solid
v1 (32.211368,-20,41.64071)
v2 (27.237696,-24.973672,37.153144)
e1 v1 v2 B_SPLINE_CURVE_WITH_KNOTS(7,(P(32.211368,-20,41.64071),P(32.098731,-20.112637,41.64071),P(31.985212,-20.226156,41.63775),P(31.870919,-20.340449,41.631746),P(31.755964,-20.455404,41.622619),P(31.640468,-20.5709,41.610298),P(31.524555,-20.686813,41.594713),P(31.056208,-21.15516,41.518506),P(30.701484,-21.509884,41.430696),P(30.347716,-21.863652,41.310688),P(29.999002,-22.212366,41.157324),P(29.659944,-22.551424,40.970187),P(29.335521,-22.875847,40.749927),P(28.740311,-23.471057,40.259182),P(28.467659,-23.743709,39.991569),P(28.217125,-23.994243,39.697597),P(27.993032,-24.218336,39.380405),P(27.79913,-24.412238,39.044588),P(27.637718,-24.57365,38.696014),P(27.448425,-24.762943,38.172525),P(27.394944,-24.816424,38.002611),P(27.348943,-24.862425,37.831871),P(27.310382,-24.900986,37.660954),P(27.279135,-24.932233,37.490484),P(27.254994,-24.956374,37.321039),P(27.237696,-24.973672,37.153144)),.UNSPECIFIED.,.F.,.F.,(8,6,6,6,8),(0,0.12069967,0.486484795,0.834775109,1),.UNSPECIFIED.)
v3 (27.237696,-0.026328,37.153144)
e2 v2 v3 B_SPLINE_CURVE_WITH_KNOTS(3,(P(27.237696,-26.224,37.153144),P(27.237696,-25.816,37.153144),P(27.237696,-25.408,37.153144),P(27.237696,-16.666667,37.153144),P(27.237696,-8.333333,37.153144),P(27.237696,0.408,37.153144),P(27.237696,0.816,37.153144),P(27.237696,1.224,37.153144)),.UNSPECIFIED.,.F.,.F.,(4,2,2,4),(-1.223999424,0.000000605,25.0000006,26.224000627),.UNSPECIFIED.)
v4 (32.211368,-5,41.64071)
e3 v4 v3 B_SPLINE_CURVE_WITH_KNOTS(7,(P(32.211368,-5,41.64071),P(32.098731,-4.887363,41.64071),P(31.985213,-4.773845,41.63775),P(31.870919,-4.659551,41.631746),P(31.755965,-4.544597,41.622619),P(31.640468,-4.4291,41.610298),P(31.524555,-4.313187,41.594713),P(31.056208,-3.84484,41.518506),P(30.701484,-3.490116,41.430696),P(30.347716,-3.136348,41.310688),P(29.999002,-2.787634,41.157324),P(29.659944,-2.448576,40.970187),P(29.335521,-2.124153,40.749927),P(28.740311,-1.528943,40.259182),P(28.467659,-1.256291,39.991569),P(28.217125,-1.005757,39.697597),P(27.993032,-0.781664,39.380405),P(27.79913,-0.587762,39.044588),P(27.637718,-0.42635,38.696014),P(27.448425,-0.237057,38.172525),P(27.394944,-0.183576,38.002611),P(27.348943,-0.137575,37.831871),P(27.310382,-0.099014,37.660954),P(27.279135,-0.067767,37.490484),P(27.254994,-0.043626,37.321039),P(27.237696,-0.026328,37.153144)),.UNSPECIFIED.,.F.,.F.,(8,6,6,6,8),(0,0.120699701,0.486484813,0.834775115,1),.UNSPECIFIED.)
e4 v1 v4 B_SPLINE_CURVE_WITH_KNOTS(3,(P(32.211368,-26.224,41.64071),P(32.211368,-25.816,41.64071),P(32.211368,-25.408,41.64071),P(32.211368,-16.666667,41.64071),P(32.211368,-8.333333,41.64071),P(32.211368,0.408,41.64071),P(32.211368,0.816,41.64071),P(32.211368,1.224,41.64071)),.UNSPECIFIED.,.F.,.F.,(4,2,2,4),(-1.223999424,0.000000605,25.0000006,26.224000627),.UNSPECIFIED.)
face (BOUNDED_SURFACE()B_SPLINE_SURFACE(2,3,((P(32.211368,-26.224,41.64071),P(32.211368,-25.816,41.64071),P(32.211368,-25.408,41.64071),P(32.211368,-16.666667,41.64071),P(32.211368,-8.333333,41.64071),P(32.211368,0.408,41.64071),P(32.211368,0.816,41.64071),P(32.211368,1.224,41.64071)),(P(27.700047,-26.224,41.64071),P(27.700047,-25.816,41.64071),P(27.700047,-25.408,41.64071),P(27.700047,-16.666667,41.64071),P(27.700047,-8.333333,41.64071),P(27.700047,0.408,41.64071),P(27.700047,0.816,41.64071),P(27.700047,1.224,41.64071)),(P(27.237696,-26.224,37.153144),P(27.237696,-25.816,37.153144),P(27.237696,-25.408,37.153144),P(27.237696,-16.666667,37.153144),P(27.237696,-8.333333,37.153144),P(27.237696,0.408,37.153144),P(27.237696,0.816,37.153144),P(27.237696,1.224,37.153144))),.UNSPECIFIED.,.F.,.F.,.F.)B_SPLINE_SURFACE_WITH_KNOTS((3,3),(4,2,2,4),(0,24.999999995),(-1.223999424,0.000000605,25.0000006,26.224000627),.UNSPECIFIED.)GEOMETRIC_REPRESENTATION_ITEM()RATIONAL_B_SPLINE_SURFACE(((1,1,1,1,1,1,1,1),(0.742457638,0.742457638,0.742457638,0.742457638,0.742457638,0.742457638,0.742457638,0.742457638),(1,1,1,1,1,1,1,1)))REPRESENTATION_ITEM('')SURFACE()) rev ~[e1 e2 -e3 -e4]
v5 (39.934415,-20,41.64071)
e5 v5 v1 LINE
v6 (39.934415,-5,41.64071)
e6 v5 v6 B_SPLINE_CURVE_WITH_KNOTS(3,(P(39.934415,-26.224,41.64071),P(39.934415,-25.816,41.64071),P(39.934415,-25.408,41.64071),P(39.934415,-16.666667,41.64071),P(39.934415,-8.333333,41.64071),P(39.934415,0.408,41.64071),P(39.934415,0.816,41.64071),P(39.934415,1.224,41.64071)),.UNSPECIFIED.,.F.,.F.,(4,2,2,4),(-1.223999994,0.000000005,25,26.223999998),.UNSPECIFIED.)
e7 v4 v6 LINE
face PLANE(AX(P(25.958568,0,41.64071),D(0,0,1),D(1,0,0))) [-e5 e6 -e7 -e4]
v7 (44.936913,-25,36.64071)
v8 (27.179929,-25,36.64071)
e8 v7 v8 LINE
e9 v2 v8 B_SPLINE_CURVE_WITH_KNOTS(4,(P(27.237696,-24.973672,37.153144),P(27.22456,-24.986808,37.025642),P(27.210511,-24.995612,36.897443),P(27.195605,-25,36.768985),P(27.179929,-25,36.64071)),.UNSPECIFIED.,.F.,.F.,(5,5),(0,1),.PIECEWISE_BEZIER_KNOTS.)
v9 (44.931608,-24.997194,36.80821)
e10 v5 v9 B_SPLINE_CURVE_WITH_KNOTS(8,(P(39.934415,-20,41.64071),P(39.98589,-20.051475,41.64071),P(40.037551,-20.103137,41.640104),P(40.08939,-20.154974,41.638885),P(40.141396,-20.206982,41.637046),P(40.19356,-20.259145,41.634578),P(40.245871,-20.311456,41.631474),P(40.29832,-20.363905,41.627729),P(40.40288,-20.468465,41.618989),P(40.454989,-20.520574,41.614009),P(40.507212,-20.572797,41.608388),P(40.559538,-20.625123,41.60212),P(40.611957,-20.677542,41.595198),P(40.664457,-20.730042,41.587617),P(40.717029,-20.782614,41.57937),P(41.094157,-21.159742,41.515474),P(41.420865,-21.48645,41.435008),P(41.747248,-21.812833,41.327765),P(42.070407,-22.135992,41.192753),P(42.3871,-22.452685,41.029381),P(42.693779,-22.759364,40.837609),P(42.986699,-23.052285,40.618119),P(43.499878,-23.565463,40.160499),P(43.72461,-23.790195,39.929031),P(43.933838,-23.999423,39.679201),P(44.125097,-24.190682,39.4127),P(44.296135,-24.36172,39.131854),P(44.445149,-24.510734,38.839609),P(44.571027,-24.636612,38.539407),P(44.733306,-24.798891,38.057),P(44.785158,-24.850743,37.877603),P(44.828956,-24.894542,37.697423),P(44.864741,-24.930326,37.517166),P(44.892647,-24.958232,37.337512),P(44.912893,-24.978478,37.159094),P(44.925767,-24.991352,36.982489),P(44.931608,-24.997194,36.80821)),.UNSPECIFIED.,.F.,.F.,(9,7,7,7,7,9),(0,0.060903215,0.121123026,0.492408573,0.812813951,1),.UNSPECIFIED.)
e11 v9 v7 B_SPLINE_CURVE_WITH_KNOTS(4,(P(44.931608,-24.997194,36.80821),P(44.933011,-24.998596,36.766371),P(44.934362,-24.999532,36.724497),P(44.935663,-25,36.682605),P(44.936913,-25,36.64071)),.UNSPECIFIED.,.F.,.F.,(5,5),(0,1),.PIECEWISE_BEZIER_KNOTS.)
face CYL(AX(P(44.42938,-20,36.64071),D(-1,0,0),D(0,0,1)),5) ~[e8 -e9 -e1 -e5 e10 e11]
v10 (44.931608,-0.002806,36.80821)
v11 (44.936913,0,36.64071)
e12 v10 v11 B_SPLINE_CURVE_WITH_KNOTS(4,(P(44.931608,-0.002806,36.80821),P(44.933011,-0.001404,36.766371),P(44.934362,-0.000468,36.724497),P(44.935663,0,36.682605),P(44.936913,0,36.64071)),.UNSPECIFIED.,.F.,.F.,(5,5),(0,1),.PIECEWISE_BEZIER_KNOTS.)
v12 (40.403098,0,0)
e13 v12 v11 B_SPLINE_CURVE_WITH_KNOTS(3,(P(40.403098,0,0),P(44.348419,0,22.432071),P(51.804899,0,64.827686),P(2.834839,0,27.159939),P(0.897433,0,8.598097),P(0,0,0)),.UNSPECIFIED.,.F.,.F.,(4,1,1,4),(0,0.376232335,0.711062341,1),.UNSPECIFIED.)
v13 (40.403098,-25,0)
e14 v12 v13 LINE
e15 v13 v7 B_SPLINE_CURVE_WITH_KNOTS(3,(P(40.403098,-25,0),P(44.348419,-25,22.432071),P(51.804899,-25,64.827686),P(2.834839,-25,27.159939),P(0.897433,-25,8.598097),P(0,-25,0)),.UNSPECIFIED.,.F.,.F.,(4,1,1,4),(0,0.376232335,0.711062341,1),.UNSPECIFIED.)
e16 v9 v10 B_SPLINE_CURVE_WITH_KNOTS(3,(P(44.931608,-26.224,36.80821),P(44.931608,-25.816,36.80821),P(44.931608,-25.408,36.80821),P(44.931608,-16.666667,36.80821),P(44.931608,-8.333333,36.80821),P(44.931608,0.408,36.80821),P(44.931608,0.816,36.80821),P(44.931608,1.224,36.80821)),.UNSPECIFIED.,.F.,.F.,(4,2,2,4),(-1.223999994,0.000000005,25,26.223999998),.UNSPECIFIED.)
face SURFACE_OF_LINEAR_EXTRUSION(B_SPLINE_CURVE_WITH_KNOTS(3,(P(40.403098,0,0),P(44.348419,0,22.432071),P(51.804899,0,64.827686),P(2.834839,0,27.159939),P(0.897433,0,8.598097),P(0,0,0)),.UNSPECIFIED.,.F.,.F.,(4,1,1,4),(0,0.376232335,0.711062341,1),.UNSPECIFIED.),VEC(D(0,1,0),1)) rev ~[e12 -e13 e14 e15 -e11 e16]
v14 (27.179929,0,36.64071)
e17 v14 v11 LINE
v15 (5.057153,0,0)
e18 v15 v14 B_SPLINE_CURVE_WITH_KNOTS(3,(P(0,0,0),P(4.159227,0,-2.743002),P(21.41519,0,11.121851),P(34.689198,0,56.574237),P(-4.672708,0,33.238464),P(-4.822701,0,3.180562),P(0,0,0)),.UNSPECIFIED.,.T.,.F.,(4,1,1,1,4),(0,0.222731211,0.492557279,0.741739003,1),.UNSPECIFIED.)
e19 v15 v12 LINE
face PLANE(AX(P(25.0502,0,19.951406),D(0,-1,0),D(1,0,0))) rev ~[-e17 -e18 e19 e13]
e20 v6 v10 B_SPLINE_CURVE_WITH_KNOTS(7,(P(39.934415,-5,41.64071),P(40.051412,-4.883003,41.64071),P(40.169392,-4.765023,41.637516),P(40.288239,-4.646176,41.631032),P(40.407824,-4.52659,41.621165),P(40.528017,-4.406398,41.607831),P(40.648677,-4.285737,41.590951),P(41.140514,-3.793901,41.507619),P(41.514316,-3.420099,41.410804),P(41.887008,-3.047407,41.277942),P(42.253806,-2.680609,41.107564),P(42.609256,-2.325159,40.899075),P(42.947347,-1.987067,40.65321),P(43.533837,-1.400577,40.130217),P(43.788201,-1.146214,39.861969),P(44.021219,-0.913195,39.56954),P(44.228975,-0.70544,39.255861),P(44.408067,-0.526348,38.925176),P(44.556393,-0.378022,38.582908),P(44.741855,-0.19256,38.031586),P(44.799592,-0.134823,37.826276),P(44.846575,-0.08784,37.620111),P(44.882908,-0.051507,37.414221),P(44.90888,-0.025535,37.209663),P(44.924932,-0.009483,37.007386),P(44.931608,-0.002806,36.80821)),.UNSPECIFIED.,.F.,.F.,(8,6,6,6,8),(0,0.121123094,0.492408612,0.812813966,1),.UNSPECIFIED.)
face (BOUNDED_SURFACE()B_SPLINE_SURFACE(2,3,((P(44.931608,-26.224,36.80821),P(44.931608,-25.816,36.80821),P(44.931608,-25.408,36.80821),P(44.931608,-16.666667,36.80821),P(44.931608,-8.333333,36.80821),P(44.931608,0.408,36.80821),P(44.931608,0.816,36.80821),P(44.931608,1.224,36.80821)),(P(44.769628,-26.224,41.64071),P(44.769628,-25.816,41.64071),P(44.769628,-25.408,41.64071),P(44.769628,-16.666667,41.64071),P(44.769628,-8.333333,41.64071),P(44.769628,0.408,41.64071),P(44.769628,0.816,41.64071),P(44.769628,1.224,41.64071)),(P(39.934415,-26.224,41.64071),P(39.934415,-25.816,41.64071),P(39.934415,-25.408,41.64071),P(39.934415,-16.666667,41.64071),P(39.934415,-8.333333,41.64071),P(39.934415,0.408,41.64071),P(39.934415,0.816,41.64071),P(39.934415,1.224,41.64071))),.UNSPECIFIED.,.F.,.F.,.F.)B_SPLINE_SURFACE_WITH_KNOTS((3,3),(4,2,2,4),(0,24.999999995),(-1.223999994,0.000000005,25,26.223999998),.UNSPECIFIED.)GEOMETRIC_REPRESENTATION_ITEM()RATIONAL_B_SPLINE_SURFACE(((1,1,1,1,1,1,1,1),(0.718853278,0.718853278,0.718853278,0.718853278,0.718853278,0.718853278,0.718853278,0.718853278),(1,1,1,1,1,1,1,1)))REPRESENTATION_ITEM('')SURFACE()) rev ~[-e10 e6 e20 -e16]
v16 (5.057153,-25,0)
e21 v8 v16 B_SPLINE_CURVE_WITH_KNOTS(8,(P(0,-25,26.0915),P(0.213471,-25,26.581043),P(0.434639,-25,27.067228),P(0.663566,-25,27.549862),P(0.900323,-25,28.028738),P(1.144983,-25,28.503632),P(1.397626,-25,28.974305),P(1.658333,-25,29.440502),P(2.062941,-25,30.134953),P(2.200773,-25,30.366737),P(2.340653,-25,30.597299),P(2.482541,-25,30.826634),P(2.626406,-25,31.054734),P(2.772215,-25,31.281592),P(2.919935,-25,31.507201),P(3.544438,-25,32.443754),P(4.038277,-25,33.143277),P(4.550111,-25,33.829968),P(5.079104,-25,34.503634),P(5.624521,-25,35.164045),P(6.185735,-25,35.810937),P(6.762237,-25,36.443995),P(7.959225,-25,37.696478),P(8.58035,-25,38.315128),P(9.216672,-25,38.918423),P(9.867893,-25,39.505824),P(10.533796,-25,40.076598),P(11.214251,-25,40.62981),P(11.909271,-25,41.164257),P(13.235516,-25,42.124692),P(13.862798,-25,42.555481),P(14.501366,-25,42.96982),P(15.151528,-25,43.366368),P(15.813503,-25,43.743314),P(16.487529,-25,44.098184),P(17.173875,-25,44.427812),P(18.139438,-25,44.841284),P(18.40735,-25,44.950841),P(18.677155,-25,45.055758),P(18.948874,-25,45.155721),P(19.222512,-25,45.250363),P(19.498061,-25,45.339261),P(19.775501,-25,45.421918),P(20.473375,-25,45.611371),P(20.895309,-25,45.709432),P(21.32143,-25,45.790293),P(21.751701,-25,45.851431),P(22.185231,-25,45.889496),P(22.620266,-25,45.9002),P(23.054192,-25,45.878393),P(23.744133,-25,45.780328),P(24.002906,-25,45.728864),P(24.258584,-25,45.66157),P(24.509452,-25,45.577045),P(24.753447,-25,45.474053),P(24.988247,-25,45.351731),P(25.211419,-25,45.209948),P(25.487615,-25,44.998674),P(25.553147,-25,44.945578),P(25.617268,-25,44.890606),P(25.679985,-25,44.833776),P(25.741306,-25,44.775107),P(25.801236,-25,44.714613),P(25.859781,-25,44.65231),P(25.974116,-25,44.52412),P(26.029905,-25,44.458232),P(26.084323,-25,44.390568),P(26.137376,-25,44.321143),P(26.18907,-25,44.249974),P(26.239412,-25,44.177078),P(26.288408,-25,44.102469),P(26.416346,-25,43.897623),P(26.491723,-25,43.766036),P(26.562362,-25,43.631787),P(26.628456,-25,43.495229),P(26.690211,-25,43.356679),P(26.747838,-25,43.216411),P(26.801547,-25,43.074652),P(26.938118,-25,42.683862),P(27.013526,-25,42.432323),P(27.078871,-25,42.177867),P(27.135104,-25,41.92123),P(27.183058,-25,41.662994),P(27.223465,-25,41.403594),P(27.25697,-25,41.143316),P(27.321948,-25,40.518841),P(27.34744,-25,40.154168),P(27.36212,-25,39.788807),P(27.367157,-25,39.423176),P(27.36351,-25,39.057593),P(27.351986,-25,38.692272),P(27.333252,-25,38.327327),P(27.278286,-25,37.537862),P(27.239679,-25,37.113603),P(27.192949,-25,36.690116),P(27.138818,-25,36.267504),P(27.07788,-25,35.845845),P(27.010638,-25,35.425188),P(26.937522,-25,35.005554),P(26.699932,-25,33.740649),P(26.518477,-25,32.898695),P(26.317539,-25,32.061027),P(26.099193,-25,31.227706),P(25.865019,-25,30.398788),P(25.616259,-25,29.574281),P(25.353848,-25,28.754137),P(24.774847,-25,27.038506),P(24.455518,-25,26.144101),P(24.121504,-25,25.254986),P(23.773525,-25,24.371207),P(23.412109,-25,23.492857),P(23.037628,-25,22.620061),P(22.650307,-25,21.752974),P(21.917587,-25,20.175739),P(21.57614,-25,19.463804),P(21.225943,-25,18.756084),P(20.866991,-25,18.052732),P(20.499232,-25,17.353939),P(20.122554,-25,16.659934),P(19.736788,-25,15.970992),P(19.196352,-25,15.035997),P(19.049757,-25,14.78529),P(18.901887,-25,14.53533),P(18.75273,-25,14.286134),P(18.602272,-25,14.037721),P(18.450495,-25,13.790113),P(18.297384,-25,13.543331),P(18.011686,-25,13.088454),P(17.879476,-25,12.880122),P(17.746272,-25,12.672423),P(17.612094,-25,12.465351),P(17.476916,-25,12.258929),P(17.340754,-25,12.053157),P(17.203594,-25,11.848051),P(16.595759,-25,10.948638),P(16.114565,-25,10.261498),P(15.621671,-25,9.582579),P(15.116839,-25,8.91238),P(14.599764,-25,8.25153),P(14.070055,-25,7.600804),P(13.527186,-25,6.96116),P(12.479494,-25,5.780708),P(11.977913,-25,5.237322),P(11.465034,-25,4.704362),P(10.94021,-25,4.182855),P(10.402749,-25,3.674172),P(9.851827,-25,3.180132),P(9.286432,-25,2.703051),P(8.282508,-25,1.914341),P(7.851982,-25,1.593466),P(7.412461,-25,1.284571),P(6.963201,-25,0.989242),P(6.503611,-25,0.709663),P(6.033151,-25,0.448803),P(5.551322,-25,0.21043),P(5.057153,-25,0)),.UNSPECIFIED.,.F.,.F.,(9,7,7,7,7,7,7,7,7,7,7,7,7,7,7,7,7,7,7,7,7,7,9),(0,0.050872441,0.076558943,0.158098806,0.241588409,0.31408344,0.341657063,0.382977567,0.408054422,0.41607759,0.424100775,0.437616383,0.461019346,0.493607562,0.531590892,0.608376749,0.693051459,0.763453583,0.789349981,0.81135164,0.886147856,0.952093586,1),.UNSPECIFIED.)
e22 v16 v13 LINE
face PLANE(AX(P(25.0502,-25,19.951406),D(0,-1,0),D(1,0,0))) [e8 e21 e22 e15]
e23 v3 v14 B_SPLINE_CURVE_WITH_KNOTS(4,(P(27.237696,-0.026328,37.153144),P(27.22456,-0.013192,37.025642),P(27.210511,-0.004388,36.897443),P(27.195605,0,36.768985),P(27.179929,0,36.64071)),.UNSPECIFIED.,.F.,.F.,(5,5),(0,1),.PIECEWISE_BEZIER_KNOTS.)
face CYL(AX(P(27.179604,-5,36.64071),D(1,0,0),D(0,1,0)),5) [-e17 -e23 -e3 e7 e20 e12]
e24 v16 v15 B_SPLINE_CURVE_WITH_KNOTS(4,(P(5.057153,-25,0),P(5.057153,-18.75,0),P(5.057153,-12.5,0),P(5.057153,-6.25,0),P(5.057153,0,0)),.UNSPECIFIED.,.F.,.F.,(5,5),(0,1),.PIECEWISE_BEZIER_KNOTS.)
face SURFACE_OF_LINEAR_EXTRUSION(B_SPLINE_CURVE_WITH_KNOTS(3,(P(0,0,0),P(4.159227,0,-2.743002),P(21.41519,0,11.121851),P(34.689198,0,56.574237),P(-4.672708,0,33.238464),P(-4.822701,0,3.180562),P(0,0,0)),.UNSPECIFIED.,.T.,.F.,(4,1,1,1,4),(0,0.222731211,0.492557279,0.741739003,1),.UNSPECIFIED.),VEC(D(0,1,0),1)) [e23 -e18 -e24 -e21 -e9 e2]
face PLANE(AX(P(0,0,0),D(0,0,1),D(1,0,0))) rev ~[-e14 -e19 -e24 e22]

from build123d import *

# Parameters (mm, degrees)
F1_DEPTH = 25
F3_DEPTH = 52.7
F4_W     = 21.8509435654
F4_H     = 7.5018182397
F5_DEPTH = 59
F6_R     = 5


with BuildPart() as f1:
    # F0 (on Front) → F1 (new body)
    with BuildSketch(Plane.XZ):
        with BuildLine():
            add(Edge.make_bspline(
                [(40.403097868, 0), (44.3484185144, 22.4320712328), (51.8048986631, 64.8276858948), (2.8348392211, 27.1599391862), (0.8974329238, 8.5980973641), (0, 0)],
                knots=[0, 0, 0, 0, 0.3762323348, 0.7110623413, 1, 1, 1, 1], degree=3))
            Line((0, 0), (40.403097868, 0))
        make_face()
    extrude(amount=F1_DEPTH)

    # F2 (on Front) → F3 (cut)
    with BuildSketch(Plane.XZ):
        with BuildLine():
            add(Edge.make_bspline(
                [(0, 0), (4.1592267834, -2.743001842), (21.4151895882, 11.1218512251), (34.6891976083, 56.5742371109), (-4.672707747, 33.2384640146), (-4.8227010914, 3.1805618367), (0, 0)],
                knots=[0, 0, 0, 0, 0.222731211, 0.4925572792, 0.7417390034, 1, 1, 1, 1], degree=3))
        make_face()
    extrude(amount=F3_DEPTH, mode=Mode.SUBTRACT)

    # F4 (on Front) → F5 (cut)
    with BuildSketch(Plane.XZ):
        with Locations((36.8840396404, 45.3916192055)):
            Rectangle(F4_W, F4_H)
    extrude(amount=F5_DEPTH, mode=Mode.SUBTRACT)

    # F6
    f6_edges = [f1.edges().sort_by_distance(p)[0] for p in [
        (27.179604, -12.5, 41.64071),
        (35.804492, -25, 41.64071),
        (35.804492, 0, 41.64071),
        (44.42938, -12.5, 41.64071),
    ]]
    fillet(f6_edges, radius=F6_R)


solid = f1.part
